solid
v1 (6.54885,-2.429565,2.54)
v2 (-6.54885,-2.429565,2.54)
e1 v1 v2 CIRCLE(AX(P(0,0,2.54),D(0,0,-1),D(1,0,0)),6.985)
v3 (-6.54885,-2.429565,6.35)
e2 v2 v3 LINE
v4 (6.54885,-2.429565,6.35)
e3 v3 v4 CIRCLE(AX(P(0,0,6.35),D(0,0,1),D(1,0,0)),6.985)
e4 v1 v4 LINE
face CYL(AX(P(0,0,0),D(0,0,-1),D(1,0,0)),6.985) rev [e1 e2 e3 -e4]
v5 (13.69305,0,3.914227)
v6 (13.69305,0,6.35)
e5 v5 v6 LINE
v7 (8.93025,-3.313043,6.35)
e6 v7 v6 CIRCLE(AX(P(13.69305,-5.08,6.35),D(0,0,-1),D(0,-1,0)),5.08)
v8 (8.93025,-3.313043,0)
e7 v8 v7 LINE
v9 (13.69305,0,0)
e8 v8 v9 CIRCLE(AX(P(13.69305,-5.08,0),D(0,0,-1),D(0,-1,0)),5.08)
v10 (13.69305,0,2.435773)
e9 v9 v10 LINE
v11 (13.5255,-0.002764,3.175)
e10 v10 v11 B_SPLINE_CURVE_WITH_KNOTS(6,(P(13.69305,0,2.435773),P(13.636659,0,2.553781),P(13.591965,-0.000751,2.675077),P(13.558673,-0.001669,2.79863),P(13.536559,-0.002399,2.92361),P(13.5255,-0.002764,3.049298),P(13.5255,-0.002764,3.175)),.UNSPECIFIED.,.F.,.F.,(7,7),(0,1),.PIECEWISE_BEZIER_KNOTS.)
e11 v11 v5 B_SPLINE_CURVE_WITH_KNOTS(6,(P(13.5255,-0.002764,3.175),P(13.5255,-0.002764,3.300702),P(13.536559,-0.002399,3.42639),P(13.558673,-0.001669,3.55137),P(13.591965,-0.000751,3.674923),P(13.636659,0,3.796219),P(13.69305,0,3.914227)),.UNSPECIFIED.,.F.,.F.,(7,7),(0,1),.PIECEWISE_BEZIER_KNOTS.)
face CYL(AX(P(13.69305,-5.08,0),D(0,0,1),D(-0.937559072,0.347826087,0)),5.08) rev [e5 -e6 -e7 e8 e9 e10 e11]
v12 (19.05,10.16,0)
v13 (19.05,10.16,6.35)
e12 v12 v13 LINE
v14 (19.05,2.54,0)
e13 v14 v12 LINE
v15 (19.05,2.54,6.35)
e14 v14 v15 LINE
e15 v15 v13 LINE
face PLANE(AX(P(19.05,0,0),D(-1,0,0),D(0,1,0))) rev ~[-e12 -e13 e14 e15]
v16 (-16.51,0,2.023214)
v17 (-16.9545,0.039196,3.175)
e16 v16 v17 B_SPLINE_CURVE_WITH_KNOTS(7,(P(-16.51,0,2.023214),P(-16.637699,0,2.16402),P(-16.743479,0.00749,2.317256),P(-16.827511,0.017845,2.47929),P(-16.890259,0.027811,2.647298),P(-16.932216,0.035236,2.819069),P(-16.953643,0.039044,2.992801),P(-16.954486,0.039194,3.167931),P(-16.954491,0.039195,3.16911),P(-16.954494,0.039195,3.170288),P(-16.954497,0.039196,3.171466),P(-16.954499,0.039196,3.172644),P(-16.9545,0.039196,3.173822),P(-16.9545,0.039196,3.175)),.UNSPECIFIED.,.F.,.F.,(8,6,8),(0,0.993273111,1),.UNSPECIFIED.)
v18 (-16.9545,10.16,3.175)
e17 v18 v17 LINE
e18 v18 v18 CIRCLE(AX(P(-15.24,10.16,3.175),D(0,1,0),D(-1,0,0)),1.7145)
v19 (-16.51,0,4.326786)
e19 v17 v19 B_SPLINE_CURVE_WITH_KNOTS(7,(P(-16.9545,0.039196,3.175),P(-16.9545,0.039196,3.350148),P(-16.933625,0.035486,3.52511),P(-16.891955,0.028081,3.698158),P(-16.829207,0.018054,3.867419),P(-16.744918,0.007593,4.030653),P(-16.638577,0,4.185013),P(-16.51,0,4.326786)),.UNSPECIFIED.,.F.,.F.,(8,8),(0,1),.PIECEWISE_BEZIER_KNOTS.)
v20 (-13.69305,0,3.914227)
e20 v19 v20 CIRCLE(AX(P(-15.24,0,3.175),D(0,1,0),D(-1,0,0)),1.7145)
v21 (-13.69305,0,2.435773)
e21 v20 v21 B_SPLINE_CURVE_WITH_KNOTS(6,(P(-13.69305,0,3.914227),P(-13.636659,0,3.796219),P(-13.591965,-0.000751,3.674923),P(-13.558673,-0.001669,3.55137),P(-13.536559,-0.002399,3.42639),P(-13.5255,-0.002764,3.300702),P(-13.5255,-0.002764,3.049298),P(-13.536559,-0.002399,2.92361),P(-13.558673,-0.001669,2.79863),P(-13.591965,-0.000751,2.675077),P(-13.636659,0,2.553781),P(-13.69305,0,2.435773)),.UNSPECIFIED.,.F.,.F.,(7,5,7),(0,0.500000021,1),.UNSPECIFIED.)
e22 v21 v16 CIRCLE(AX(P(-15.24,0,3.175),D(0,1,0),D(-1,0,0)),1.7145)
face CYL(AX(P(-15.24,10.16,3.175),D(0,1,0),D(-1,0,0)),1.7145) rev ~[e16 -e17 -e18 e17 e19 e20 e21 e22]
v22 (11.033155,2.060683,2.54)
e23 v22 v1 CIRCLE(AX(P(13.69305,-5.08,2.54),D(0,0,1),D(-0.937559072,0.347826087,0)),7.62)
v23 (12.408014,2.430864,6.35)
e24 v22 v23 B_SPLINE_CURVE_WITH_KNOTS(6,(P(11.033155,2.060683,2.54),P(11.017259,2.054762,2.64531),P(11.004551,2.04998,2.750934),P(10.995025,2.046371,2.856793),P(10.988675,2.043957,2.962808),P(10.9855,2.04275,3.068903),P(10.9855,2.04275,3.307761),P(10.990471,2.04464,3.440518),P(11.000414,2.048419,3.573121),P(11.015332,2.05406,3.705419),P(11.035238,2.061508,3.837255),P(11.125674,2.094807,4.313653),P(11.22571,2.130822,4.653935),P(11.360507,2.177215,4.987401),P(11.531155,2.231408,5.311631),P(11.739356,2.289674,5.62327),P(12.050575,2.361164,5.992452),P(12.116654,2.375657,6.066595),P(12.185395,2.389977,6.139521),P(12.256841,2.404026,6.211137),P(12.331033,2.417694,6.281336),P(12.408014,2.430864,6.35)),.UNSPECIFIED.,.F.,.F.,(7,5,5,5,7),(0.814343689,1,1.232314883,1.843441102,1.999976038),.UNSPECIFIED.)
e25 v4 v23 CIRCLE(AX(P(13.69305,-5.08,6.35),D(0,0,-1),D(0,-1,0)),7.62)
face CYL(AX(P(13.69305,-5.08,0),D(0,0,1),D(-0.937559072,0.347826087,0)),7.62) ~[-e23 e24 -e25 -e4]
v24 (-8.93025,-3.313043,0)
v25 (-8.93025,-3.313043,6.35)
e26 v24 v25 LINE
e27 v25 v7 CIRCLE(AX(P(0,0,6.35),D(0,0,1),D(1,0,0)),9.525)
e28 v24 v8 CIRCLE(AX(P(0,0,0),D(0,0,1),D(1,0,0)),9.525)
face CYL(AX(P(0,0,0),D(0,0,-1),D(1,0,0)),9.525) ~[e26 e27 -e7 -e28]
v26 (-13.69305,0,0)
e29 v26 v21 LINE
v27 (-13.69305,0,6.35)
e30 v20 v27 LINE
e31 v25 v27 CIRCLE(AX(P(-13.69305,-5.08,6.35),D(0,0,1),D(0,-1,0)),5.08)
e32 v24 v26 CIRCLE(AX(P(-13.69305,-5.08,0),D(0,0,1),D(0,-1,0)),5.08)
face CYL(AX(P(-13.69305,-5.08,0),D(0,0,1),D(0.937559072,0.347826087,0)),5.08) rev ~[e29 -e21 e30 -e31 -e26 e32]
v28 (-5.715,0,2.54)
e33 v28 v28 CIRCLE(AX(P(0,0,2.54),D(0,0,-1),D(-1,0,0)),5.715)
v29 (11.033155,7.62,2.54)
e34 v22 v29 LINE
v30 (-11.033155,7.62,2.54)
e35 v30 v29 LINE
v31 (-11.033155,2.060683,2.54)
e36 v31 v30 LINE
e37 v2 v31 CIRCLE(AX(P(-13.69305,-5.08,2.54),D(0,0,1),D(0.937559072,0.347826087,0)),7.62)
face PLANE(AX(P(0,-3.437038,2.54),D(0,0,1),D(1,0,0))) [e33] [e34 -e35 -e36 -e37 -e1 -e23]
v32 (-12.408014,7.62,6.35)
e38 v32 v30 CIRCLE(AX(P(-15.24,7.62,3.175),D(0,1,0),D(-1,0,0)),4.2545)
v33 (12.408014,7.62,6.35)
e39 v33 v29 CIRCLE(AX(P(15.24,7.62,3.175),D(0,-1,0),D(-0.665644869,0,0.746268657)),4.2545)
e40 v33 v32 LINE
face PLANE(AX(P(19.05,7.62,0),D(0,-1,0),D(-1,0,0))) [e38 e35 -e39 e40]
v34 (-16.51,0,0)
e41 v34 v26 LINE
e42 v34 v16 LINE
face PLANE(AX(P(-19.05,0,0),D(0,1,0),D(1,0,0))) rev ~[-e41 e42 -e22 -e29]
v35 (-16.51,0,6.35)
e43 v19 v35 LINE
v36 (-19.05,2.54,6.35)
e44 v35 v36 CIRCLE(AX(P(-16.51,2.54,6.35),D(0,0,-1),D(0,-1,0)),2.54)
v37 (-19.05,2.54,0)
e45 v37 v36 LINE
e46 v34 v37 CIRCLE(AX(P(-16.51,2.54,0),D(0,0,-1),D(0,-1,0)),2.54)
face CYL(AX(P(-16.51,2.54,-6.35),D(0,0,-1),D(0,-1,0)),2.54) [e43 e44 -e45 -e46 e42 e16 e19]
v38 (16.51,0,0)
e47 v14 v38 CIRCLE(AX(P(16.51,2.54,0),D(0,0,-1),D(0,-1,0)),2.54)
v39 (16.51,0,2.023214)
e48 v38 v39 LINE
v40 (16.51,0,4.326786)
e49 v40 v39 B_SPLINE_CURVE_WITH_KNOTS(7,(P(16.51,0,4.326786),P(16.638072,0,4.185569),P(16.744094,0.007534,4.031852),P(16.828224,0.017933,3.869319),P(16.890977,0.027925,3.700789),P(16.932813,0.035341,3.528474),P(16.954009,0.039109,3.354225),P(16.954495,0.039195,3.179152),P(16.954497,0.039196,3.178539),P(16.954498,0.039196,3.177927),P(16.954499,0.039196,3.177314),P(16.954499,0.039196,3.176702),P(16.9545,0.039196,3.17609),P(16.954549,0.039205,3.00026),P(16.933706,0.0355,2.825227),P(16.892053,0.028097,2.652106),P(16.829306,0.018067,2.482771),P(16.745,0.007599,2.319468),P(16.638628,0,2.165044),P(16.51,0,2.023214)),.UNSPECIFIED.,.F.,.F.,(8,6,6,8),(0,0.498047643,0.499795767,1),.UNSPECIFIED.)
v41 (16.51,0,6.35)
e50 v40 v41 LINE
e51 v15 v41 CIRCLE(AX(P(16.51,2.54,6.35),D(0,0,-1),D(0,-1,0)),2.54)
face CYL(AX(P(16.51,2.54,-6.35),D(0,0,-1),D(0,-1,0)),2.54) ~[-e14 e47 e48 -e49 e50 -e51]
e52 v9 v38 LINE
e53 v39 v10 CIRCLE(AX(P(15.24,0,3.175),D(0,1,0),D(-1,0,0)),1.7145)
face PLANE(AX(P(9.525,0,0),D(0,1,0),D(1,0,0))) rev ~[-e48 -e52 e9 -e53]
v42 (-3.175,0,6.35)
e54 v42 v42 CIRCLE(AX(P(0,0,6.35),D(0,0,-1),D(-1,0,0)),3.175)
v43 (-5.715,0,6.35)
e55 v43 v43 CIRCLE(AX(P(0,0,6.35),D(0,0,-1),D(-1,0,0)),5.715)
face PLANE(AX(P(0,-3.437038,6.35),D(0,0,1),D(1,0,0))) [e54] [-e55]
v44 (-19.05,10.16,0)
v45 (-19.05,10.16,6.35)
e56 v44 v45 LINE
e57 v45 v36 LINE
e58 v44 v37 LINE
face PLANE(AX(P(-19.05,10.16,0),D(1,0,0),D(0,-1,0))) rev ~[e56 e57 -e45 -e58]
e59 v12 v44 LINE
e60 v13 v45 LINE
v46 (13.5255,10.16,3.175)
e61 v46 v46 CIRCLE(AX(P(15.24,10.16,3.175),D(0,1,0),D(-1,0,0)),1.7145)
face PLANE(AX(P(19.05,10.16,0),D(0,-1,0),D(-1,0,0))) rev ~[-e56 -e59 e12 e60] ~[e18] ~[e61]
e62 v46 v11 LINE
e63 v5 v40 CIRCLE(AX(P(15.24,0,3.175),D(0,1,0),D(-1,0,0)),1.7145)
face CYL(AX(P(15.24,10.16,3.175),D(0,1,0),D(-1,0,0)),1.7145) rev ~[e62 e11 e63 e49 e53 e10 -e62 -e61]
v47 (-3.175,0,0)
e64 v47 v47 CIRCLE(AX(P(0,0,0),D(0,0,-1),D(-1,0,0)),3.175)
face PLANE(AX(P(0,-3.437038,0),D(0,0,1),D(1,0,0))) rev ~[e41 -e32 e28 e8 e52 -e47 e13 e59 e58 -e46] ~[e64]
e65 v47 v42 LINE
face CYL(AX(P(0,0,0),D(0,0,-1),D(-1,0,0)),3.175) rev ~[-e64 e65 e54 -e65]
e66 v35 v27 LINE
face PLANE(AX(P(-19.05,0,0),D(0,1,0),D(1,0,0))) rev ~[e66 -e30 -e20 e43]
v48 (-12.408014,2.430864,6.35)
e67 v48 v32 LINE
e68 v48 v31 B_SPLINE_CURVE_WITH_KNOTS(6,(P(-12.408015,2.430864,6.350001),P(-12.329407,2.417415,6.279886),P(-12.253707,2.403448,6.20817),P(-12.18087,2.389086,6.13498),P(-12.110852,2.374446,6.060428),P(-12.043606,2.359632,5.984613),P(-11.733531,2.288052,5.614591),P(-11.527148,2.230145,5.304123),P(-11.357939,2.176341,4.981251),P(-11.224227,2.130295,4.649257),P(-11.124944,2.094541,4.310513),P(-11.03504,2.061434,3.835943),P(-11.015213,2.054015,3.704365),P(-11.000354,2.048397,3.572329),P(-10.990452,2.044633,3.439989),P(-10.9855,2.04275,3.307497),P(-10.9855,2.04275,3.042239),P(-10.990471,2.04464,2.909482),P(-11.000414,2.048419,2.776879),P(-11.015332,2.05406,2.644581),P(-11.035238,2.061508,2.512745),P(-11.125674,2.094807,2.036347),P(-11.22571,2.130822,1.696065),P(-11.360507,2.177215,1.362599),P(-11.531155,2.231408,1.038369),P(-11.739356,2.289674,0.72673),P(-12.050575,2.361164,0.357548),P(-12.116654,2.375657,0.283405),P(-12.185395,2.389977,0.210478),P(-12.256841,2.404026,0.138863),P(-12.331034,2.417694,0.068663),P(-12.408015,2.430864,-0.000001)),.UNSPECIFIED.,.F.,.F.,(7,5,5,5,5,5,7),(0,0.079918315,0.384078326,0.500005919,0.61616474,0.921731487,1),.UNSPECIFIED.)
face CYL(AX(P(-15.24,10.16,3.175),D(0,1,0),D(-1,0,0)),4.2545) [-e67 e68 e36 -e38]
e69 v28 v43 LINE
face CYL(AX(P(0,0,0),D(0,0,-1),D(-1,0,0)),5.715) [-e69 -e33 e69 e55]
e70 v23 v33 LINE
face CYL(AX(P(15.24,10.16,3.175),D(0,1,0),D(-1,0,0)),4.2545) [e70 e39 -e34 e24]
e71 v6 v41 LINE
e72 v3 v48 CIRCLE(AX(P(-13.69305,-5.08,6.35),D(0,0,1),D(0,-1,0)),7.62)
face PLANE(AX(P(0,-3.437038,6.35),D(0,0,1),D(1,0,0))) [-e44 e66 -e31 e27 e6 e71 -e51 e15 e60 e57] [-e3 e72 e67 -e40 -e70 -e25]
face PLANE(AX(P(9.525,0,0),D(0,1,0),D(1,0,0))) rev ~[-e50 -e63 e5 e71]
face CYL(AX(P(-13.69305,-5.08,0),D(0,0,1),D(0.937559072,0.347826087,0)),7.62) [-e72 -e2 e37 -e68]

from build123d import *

# Parameters (mm, degrees)
F1_DEPTH    = 6.35
F2_R        = 5.08
F3_R        = 1.7145
F5_DEPTH    = 19.686
F6_T        = 2.54
F7_T1_DEPTH = 19.05


# Not quite as in the source:
# - a fillet or chamfer that OpenCascade refuses, or shapes differently, is made with other operations: its cross-section is extruded or revolved along the edge and cut away or added
# - a shell that OpenCascade refuses in one call is made with other operations: the cavity is built on its own and cut out
# - a feature names something its author has since deleted; it is built from what else it names


with BuildPart() as f1:
    # F0 (on Top) → F1 (new body)
    with BuildSketch(Plane.XY):
        with BuildLine():
            Line((9.525, 0), (3.175, 0))
            ThreePointArc((3.175, 0), (0, -3.175), (-3.175, 0))
            Line((-3.175, 0), (-9.525, 0))
            ThreePointArc((-9.525, 0), (0, -9.525), (9.525, 0))
        make_face()
        with BuildLine():
            ThreePointArc((-3.175, 0), (0, 3.175), (3.175, 0))
            Line((3.175, 0), (9.525, 0))
            ThreePointArc((9.525, 0), (0, 9.525), (-9.525, 0))
            Line((-9.525, 0), (-3.175, 0))
        make_face()
        with BuildLine():
            ThreePointArc((-9.525, 0), (0, 9.525), (9.525, 0))
            Line((9.525, 0), (19.05, 0))
            Line((19.05, 0), (19.05, 10.16))
            Line((19.05, 10.16), (-19.05, 10.16))
            Line((-19.05, 10.16), (-19.05, 0))
            Line((-19.05, 0), (-9.525, 0))
        make_face()
    extrude(amount=F1_DEPTH)

    # F2
    f2_edges = [f1.edges().sort_by_distance(p)[0] for p in [
        (9.525, 0, 3.175),
        (-9.525, 0, 3.175),
    ]]
    fillet(f2_edges, radius=F2_R)

    # F3 (on face) → F5 (cut, through all)
    with BuildSketch(Plane(origin=(0, 10.16, 0), x_dir=(-1, 0, 0), z_dir=(0, 1, 0))):
        with Locations((15.24, 3.175)):
            Circle(F3_R)
        with Locations((-15.24, 3.175)):
            Circle(F3_R)
    extrude(amount=-F5_DEPTH, mode=Mode.SUBTRACT)

    # F6: shell of thickness 2.54, made by hand


with BuildPart() as f6_core1:
    # F6_t2: copy of F1
    add(f1.part)

    # the walls: a layer under each face that stays
    f6_faces = [f6_core1.faces().sort_by_distance(p)[0] for p in [
        (0, -9.525, 3.175),
        (-12.7, 0.3175, 0),
        (-10.7921658217, -0.9097158891, 3.175),
        (10.7921658217, -0.9097158891, 3.175),
        (-18.1571750408, 0, 5.2916666667),
        (14.5858752038, 0, 5.2916666667),
        (-19.05, 5.08, 3.175),
        (19.05, 5.08, 3.175),
        (0, 10.16, 3.175),
        (3.175, 0, 3.175),
        (-13.5255, 5.0786180746, 3.175),
        (16.9545, 5.0786180746, 3.175),
    ]]
    thicken(f6_faces, amount=-F6_T, mode=Mode.SUBTRACT)


with BuildPart() as f1_1:
    add(f1.part)

    # what is left inside the walls is the cavity
    f6_cavity = [f6_core1.part.solids().sort_by_distance(p)[0] for p in [
        (-6.204007, 2.751667, 6.3246),
    ]]
    add(f6_cavity, mode=Mode.SUBTRACT)

    # F7: fillet of radius 2.54 on 2 edges, made by hand

    # F7_s2 → F7_t1 (cut)
    with BuildSketch(Plane.XY.offset(-6.35)):
        with BuildLine():
            ThreePointArc((-16.51, 0), (-18.3060512242, 0.7439487758), (-19.05, 2.54))
            Line((-19.05, 2.54), (-19.05, 0))
            Line((-19.05, 0), (-16.51, 0))
        make_face()
        with BuildLine():
            ThreePointArc((16.51, 0), (18.3060512242, 0.7439487758), (19.05, 2.54))
            Line((19.05, 2.54), (19.05, 0))
            Line((19.05, 0), (16.51, 0))
        make_face()
    extrude(amount=F7_T1_DEPTH, mode=Mode.SUBTRACT)


solid = f1_1.part
